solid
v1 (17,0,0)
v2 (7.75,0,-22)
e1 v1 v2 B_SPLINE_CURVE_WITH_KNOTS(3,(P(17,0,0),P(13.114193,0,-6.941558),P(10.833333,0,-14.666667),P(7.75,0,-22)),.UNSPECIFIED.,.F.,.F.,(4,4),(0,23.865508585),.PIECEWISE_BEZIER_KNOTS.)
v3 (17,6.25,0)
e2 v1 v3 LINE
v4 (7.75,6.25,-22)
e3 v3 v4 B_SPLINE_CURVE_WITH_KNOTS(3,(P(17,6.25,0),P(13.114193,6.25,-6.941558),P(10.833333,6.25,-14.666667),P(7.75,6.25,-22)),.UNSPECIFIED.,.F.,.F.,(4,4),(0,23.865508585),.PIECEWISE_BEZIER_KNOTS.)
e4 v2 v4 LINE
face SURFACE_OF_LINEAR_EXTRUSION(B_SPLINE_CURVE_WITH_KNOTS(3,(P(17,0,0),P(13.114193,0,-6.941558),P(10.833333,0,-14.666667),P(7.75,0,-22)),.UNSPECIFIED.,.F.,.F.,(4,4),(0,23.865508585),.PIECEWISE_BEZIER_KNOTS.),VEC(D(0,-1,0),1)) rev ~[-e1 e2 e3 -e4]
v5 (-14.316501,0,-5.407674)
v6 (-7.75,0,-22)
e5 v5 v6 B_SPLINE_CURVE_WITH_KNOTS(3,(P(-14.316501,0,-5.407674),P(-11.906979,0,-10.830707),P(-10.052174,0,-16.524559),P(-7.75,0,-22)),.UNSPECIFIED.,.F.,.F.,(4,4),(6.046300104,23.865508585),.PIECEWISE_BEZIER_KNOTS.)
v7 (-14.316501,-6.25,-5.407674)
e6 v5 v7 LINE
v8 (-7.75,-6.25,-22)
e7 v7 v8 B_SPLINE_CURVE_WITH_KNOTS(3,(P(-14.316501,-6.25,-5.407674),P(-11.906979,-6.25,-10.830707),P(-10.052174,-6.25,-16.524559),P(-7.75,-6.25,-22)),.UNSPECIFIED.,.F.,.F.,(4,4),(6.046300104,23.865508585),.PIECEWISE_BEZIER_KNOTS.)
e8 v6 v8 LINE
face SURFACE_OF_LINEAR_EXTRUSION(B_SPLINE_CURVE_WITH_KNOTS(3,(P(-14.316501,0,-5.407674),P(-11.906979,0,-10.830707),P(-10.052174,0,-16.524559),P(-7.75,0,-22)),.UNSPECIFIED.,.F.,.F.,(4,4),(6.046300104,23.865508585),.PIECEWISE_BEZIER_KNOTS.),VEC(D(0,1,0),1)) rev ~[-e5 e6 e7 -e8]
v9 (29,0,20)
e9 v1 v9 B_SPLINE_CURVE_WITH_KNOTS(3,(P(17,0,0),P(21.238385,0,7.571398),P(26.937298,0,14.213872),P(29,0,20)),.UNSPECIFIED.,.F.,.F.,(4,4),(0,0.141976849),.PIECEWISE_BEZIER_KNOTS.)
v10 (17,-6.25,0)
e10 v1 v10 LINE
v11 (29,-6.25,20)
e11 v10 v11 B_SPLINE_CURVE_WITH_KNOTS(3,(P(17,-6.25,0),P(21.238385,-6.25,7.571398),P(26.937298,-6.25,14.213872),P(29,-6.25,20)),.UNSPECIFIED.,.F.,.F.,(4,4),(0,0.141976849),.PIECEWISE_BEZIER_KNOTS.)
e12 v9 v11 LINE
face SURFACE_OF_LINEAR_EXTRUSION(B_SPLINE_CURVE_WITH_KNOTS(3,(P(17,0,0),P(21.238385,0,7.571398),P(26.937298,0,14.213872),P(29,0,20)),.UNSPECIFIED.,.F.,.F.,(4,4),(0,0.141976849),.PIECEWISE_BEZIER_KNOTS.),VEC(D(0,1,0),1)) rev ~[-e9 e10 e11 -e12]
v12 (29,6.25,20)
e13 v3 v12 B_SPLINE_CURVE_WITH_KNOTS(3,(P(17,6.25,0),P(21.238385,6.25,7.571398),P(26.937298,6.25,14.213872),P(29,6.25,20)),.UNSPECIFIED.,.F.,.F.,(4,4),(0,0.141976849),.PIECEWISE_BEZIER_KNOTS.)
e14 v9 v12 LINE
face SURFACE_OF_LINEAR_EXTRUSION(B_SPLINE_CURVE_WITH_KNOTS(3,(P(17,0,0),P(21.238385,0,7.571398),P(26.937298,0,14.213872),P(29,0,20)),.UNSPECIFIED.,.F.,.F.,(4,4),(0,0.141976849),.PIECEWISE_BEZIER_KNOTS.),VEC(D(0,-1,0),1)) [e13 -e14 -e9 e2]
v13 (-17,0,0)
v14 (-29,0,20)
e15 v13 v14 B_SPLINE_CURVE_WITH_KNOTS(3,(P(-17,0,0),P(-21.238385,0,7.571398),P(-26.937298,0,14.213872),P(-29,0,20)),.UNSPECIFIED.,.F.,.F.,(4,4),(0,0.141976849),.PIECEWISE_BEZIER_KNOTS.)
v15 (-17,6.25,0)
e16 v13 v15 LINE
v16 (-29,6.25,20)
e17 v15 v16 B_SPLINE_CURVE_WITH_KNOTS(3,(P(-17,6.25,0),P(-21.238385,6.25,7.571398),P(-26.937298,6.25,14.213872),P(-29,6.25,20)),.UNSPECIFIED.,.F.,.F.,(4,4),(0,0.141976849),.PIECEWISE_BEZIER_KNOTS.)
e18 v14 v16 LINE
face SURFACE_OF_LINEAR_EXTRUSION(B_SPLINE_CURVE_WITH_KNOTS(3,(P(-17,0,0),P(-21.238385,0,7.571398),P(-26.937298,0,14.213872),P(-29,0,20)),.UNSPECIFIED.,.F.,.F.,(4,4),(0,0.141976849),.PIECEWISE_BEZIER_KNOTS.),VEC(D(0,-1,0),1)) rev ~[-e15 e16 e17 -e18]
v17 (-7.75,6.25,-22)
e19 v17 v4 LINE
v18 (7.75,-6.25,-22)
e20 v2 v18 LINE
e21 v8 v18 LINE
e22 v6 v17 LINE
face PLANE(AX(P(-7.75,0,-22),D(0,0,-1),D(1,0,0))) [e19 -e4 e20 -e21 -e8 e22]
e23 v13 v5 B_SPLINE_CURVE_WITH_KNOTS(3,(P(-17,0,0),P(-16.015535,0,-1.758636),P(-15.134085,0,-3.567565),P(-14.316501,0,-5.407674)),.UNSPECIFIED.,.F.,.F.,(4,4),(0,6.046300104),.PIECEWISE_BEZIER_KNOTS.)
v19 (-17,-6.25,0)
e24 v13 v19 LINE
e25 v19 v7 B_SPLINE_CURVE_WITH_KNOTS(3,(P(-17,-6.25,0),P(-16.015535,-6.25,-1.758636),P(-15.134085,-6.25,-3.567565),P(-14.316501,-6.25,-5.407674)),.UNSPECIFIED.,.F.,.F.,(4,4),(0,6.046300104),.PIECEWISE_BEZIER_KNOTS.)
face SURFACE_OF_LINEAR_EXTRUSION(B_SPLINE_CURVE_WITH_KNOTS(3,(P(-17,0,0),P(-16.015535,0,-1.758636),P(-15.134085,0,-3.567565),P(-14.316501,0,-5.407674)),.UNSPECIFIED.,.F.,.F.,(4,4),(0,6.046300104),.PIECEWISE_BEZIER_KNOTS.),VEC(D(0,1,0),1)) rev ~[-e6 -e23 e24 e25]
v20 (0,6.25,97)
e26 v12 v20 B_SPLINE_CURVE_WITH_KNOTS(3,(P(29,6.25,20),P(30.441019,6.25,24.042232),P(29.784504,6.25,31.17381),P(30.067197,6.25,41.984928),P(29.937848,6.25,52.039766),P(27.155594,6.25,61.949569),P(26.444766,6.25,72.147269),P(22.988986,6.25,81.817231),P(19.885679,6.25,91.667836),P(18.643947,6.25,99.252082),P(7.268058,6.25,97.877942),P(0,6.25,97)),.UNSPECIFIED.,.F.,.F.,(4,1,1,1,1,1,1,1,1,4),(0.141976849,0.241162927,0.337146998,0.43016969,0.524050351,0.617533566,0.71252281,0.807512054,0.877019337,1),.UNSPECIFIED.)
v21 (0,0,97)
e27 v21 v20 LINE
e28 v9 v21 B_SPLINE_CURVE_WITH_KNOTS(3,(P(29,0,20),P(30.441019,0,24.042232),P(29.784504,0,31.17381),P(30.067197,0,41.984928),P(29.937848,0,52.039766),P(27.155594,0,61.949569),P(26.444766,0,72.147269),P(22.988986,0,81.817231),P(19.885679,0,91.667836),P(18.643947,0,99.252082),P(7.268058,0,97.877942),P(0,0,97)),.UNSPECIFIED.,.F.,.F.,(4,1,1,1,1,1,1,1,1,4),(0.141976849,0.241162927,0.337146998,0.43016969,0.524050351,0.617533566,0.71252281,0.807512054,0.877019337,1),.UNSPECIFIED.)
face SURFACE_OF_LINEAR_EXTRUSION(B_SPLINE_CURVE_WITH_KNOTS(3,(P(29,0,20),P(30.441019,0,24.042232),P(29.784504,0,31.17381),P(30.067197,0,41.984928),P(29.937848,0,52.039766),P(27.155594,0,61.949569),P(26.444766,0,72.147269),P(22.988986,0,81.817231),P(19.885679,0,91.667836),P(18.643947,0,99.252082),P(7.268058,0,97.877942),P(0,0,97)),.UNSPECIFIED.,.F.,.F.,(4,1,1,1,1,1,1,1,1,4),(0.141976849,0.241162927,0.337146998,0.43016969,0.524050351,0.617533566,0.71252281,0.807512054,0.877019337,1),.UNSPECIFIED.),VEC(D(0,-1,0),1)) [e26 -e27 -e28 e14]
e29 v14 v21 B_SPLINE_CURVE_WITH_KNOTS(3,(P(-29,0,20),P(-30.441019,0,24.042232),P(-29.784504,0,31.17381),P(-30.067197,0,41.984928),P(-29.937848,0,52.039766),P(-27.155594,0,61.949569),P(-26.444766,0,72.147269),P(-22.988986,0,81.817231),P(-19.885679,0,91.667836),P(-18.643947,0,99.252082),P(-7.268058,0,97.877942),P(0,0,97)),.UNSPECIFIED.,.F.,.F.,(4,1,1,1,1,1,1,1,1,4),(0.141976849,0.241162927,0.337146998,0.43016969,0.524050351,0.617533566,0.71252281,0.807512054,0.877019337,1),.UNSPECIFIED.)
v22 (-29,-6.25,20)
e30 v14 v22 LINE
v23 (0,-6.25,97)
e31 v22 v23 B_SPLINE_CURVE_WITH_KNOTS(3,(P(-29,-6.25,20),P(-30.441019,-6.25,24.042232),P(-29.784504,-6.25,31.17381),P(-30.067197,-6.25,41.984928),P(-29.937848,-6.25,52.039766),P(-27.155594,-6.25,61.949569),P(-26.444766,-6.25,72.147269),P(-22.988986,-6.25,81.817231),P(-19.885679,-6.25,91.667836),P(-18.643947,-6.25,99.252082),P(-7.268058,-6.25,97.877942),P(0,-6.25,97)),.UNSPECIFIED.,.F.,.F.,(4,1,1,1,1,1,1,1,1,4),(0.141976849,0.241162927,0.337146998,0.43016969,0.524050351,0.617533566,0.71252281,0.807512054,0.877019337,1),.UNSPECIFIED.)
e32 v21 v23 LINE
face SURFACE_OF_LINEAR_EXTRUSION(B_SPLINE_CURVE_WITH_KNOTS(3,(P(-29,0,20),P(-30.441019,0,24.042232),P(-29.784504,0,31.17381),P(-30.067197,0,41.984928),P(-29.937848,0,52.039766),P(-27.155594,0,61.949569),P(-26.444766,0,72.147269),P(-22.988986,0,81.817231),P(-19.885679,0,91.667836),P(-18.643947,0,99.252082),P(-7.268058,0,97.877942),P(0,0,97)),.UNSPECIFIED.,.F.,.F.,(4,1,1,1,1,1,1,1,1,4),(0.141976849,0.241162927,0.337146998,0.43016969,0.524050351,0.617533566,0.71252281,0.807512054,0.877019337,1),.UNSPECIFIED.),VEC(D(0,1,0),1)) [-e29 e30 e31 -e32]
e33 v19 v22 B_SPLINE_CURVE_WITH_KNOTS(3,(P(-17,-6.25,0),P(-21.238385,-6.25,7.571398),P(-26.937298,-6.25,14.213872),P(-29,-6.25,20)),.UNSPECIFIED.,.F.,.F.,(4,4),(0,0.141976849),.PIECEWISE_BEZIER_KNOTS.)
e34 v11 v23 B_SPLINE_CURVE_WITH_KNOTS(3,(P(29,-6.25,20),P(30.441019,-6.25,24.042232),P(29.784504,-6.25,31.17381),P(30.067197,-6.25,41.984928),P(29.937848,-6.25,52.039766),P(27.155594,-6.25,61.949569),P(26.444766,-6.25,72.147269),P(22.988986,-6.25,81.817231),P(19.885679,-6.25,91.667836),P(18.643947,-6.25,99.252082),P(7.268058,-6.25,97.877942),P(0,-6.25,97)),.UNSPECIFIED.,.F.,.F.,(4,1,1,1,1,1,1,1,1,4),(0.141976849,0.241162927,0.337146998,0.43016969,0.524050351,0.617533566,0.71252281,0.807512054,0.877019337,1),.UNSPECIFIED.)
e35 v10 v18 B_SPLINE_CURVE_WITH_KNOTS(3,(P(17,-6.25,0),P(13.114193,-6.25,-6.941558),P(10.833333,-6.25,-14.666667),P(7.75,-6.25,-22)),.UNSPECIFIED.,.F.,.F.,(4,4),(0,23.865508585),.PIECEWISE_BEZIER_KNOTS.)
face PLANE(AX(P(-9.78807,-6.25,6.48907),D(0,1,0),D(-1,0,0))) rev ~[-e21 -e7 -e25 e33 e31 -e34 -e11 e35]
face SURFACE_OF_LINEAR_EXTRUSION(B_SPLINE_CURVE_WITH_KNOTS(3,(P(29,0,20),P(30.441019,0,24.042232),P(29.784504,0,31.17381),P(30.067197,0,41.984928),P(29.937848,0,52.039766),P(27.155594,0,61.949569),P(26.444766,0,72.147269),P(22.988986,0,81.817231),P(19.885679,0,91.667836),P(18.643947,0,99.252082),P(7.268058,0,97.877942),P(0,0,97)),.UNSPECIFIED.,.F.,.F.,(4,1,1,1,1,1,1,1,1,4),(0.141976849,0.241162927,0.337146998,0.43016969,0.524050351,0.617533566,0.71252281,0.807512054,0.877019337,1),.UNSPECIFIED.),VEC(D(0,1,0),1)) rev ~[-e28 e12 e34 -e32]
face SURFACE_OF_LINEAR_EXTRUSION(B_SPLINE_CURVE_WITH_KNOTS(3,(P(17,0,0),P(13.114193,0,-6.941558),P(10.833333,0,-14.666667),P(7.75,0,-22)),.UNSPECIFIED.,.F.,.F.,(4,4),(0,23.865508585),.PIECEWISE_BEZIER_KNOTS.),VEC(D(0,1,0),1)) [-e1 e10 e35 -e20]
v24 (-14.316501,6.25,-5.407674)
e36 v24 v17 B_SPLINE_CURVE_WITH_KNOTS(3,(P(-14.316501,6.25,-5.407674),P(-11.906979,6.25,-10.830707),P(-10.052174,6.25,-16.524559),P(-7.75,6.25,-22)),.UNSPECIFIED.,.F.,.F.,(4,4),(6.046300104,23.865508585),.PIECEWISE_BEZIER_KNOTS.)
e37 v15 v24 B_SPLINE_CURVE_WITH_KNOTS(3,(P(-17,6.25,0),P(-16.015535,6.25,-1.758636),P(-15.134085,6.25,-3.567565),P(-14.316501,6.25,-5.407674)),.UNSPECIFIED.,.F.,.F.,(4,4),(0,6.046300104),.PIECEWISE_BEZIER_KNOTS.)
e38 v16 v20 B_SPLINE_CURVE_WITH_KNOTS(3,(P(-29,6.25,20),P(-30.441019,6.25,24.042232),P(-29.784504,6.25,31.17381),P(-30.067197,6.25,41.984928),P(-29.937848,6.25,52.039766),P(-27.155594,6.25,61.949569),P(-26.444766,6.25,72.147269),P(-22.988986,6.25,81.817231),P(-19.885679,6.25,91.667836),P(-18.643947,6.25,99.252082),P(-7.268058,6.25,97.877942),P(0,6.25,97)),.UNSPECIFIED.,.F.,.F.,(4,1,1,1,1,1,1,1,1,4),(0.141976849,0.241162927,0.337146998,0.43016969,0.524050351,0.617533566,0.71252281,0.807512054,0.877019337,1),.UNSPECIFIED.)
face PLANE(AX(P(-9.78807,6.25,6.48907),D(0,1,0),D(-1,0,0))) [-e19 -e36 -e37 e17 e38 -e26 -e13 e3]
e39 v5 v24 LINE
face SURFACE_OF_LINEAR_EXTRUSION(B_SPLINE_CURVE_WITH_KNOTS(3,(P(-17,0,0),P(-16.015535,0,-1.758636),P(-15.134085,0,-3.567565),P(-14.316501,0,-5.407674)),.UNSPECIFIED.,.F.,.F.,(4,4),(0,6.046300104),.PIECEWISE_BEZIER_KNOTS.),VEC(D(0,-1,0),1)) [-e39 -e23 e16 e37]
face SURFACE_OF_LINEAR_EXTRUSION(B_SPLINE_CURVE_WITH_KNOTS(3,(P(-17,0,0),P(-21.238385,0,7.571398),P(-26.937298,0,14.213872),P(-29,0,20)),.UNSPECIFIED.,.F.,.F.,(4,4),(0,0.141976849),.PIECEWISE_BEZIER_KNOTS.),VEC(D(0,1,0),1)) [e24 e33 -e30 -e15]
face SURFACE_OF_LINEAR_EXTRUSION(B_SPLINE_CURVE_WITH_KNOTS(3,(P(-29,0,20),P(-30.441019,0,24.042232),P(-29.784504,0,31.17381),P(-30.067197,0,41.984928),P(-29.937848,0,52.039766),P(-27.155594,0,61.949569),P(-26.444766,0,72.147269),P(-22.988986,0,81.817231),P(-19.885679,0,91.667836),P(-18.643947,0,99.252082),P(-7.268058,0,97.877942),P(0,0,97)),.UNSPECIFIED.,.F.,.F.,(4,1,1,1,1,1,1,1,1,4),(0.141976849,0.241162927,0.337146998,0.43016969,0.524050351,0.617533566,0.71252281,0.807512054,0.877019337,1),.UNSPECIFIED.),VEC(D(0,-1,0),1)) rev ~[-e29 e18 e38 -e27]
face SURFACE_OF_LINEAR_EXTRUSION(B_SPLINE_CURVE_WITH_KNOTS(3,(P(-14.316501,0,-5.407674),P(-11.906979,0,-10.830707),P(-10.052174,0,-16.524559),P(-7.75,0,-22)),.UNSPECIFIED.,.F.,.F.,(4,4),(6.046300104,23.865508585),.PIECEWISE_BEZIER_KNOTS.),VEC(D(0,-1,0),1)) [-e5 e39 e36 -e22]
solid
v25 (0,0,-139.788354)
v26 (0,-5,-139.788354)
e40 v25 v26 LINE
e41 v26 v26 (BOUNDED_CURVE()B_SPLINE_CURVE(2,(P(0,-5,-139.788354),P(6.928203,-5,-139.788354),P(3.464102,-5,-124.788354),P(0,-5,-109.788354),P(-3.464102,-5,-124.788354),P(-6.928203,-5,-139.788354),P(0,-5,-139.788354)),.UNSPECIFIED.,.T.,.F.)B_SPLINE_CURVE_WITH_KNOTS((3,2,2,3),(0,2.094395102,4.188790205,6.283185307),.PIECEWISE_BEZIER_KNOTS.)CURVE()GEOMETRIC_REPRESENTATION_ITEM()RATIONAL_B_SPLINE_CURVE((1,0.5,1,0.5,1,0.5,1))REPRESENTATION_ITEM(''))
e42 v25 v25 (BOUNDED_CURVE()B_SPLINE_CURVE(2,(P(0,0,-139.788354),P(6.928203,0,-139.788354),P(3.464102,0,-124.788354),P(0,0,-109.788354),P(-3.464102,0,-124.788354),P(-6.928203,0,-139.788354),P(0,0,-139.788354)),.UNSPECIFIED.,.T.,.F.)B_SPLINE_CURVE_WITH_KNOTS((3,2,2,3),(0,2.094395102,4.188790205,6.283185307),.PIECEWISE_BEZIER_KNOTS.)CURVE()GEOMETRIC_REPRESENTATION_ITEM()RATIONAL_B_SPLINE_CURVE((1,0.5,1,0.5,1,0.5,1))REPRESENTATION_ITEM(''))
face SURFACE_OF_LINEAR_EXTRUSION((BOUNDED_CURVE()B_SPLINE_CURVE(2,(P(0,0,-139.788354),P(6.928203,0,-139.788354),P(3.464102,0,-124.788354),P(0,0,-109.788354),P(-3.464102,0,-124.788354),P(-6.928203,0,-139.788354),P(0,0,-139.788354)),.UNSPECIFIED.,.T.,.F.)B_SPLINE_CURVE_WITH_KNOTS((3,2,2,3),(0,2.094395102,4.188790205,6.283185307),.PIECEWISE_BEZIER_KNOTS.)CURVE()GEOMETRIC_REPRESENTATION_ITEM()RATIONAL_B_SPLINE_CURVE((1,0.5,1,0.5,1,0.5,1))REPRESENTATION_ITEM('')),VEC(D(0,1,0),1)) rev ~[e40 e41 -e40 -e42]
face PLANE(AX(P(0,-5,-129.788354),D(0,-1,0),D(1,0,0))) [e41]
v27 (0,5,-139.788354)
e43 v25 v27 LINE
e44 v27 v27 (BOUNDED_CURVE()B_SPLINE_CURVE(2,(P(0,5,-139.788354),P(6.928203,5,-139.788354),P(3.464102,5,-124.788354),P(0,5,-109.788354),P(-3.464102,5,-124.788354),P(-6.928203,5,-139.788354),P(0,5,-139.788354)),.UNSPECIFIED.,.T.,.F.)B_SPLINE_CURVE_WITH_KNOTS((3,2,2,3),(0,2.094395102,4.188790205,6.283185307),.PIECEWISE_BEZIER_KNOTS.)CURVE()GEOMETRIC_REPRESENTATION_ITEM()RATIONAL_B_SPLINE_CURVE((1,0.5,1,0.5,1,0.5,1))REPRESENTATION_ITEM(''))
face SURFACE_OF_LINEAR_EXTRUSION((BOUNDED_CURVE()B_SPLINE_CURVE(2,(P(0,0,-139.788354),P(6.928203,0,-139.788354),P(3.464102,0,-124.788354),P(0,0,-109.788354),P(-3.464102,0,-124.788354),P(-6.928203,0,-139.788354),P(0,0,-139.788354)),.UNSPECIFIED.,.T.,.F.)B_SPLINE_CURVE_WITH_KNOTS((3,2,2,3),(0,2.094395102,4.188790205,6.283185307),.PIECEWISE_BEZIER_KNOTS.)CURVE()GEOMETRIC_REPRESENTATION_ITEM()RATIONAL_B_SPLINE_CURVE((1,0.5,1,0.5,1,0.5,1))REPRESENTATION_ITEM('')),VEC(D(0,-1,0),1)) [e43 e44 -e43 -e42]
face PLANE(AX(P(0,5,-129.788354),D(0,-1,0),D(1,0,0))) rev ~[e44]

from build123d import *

# Parameters (mm, degrees)
F4_DEPTH = 5
F5_DEPTH = 6.25


# Not quite as in the source:
# - a feature of the source that left no trace in its solid (it failed there, or was rolled back) is left out
# - the program builds the solid bodies; features that only make, move or delete a surface that nothing else refers to are left out


with BuildPart() as f4:
    # F3 (on Front) → F4 (new body, symmetric)
    with BuildSketch(Plane.XZ):
        with BuildLine():
            add(Edge.make_bspline(
                [(0, -139.7883538913), (6.9282032303, -139.7883538913), (3.4641016151, -124.7883538913), (0, -109.7883538913), (-3.4641016151, -124.7883538913), (-6.9282032303, -139.7883538913), (0, -139.7883538913)],
                knots=[0, 0, 0, 2.0943951024, 2.0943951024, 4.1887902048, 4.1887902048, 6.2831853072, 6.2831853072, 6.2831853072], degree=2, weights=[1, 0.5, 1, 0.5, 1, 0.5, 1]))
        make_face()
    extrude(amount=F4_DEPTH, both=True)


with BuildPart() as f5:
    # F0 (on Front) → F5 (new body, symmetric)
    with BuildSketch(Plane.XZ):
        with BuildLine():
            add(Edge.make_bspline(
                [(0, 0), (-6.1817182185, 1.5497331273), (-16.6267945213, 4.1682738294), (-21.2329716017, 7.7883473251), (-23, 10)],
                knots=[0, 0, 0, 0, 0.3980714095, 0.6726101222, 0.6726101222, 0.6726101222, 0.6726101222], degree=3))
            Line((0, 0), (0, 10))
            Line((0, 10), (-23, 10))
        make_face()
        with BuildLine():
            Line((-17, 0), (0, 0))
            add(Edge.make_bspline(
                [(0, 0), (-6.1817182185, 1.5497331273), (-16.6267945213, 4.1682738294), (-21.2329716017, 7.7883473251), (-23, 10)],
                knots=[0, 0, 0, 0, 0.3980714095, 0.6726101222, 0.6726101222, 0.6726101222, 0.6726101222], degree=3))
            add(Edge.make_bspline(
                [(-23, 10), (-25.1071972174, 12.6374156561), (-27.0535986087, 16.318707828), (-29, 20)],
                knots=[0.6726101222, 0.6726101222, 0.6726101222, 0.6726101222, 1, 1, 1, 1], degree=3))
            add(Edge.make_bspline(
                [(-17, 0), (-21.2383851929, 7.571398185), (-26.9372982981, 14.2138719481), (-29, 20)],
                knots=[0, 0, 0, 0, 0.1419768486, 0.1419768486, 0.1419768486, 0.1419768486], degree=3))
        make_face()
        with BuildLine():
            Line((17, 0), (0, 0))
            Line((0, 0), (-17, 0))
            add(Edge.make_bspline(
                [(-17, 0), (-16.0155350041, -1.7586359295), (-15.134084666, -3.5675646177), (-14.3165010119, -5.4076736428)],
                knots=[0, 0, 0, 0, 6.0463001038, 6.0463001038, 6.0463001038, 6.0463001038], degree=3))
            add(Edge.make_bspline(
                [(-7.75, -22), (-8.6932001461, -17.4038997455), (-11.3156170337, -11.5477802243), (-14.3165010119, -5.4076736428)],
                knots=[0.8975094294, 0.8975094294, 0.8975094294, 0.8975094294, 0.9769003565, 0.9769003565, 0.9769003565, 0.9769003565], degree=3))
            Line((-7.75, -22), (0, -22))
            Line((0, -22), (7.75, -22))
            add(Edge.make_bspline(
                [(17, 0), (13.1141925793, -6.9415576719), (10.8333333333, -14.6666666667), (7.75, -22)],
                knots=[0, 0, 0, 0, 23.8655085846, 23.8655085846, 23.8655085846, 23.8655085846], degree=3))
        make_face()
        with BuildLine():
            Line((0, 10), (0, 0))
            add(Edge.make_bspline(
                [(0, 0), (6.1817182185, 1.5497331273), (16.6267945213, 4.1682738294), (21.2329716017, 7.7883473251), (23, 10)],
                knots=[0, 0, 0, 0, 0.3980714095, 0.6726101222, 0.6726101222, 0.6726101222, 0.6726101222], degree=3))
            Line((23, 10), (0, 10))
        make_face()
        with BuildLine():
            add(Edge.make_bspline(
                [(0, 0), (6.1817182185, 1.5497331273), (16.6267945213, 4.1682738294), (21.2329716017, 7.7883473251), (23, 10)],
                knots=[0, 0, 0, 0, 0.3980714095, 0.6726101222, 0.6726101222, 0.6726101222, 0.6726101222], degree=3))
            Line((0, 0), (17, 0))
            add(Edge.make_bspline(
                [(17, 0), (21.2383851929, 7.571398185), (26.9372982981, 14.2138719481), (29, 20)],
                knots=[0, 0, 0, 0, 0.1419768486, 0.1419768486, 0.1419768486, 0.1419768486], degree=3))
            add(Edge.make_bspline(
                [(23, 10), (25.1071972174, 12.6374156561), (27.0535986087, 16.318707828), (29, 20)],
                knots=[0.6726101222, 0.6726101222, 0.6726101222, 0.6726101222, 1, 1, 1, 1], degree=3))
        make_face()
        with BuildLine():
            Line((-23, 10), (0, 10))
            Line((0, 10), (0, 20))
            Line((0, 20), (0, 22))
            Line((0, 22), (0, 32))
            Line((0, 32), (0, 42))
            Line((0, 42), (0, 52))
            Line((0, 52), (0, 62))
            Line((0, 62), (0, 72))
            Line((0, 72), (0, 82))
            Line((0, 82), (0, 92))
            Line((0, 92), (0, 97))
            add(Edge.make_bspline(
                [(-29, 20), (-30.4410186861, 24.0422319112), (-29.7845042484, 31.1738104083), (-30.06719671, 41.9849282884), (-29.9378480605, 52.0397662603), (-27.155594339, 61.9495686988), (-26.4447656669, 72.1472686821), (-22.9889862534, 81.8172313094), (-19.8856790399, 91.6678357607), (-18.6439473926, 99.252081713), (-7.2680581597, 97.8779416175), (0, 97)],
                knots=[0.1419768486, 0.1419768486, 0.1419768486, 0.1419768486, 0.2411629265, 0.3371469979, 0.4301696896, 0.5240503513, 0.6175335655, 0.7125228096, 0.8075120536, 0.8770193366, 1, 1, 1, 1], degree=3))
            add(Edge.make_bspline(
                [(-23, 10), (-25.1071972174, 12.6374156561), (-27.0535986087, 16.318707828), (-29, 20)],
                knots=[0.6726101222, 0.6726101222, 0.6726101222, 0.6726101222, 1, 1, 1, 1], degree=3))
        make_face()
        with BuildLine():
            Line((0, 20), (0, 10))
            Line((0, 10), (23, 10))
            add(Edge.make_bspline(
                [(23, 10), (25.1071972174, 12.6374156561), (27.0535986087, 16.318707828), (29, 20)],
                knots=[0.6726101222, 0.6726101222, 0.6726101222, 0.6726101222, 1, 1, 1, 1], degree=3))
            add(Edge.make_bspline(
                [(29, 20), (30.4410186861, 24.0422319112), (29.7845042484, 31.1738104083), (30.06719671, 41.9849282884), (29.9378480605, 52.0397662603), (27.155594339, 61.9495686988), (26.4447656669, 72.1472686821), (22.9889862534, 81.8172313094), (19.8856790399, 91.6678357607), (18.6439473926, 99.252081713), (7.2680581597, 97.8779416175), (0, 97)],
                knots=[0.1419768486, 0.1419768486, 0.1419768486, 0.1419768486, 0.2411629265, 0.3371469979, 0.4301696896, 0.5240503513, 0.6175335655, 0.7125228096, 0.8075120536, 0.8770193366, 1, 1, 1, 1], degree=3))
            Line((0, 97), (0, 92))
            Line((0, 92), (0, 82))
            Line((0, 82), (0, 72))
            Line((0, 72), (0, 62))
            Line((0, 62), (0, 52))
            Line((0, 52), (0, 42))
            Line((0, 42), (0, 32))
            Line((0, 32), (0, 22))
            Line((0, 22), (0, 20))
        make_face()
        with BuildLine():
            add(Edge.make_bspline(
                [(-7.75, -22), (-8.6932001461, -17.4038997455), (-11.3156170337, -11.5477802243), (-14.3165010119, -5.4076736428)],
                knots=[0.8975094294, 0.8975094294, 0.8975094294, 0.8975094294, 0.9769003565, 0.9769003565, 0.9769003565, 0.9769003565], degree=3))
            add(Edge.make_bspline(
                [(-14.3165010119, -5.4076736428), (-11.906978935, -10.8307068669), (-10.0521742565, -16.524558525), (-7.75, -22)],
                knots=[6.0463001038, 6.0463001038, 6.0463001038, 6.0463001038, 23.8655085846, 23.8655085846, 23.8655085846, 23.8655085846], degree=3))
        make_face()
    extrude(amount=F5_DEPTH, both=True)


solid = Compound([f4.part, f5.part])
